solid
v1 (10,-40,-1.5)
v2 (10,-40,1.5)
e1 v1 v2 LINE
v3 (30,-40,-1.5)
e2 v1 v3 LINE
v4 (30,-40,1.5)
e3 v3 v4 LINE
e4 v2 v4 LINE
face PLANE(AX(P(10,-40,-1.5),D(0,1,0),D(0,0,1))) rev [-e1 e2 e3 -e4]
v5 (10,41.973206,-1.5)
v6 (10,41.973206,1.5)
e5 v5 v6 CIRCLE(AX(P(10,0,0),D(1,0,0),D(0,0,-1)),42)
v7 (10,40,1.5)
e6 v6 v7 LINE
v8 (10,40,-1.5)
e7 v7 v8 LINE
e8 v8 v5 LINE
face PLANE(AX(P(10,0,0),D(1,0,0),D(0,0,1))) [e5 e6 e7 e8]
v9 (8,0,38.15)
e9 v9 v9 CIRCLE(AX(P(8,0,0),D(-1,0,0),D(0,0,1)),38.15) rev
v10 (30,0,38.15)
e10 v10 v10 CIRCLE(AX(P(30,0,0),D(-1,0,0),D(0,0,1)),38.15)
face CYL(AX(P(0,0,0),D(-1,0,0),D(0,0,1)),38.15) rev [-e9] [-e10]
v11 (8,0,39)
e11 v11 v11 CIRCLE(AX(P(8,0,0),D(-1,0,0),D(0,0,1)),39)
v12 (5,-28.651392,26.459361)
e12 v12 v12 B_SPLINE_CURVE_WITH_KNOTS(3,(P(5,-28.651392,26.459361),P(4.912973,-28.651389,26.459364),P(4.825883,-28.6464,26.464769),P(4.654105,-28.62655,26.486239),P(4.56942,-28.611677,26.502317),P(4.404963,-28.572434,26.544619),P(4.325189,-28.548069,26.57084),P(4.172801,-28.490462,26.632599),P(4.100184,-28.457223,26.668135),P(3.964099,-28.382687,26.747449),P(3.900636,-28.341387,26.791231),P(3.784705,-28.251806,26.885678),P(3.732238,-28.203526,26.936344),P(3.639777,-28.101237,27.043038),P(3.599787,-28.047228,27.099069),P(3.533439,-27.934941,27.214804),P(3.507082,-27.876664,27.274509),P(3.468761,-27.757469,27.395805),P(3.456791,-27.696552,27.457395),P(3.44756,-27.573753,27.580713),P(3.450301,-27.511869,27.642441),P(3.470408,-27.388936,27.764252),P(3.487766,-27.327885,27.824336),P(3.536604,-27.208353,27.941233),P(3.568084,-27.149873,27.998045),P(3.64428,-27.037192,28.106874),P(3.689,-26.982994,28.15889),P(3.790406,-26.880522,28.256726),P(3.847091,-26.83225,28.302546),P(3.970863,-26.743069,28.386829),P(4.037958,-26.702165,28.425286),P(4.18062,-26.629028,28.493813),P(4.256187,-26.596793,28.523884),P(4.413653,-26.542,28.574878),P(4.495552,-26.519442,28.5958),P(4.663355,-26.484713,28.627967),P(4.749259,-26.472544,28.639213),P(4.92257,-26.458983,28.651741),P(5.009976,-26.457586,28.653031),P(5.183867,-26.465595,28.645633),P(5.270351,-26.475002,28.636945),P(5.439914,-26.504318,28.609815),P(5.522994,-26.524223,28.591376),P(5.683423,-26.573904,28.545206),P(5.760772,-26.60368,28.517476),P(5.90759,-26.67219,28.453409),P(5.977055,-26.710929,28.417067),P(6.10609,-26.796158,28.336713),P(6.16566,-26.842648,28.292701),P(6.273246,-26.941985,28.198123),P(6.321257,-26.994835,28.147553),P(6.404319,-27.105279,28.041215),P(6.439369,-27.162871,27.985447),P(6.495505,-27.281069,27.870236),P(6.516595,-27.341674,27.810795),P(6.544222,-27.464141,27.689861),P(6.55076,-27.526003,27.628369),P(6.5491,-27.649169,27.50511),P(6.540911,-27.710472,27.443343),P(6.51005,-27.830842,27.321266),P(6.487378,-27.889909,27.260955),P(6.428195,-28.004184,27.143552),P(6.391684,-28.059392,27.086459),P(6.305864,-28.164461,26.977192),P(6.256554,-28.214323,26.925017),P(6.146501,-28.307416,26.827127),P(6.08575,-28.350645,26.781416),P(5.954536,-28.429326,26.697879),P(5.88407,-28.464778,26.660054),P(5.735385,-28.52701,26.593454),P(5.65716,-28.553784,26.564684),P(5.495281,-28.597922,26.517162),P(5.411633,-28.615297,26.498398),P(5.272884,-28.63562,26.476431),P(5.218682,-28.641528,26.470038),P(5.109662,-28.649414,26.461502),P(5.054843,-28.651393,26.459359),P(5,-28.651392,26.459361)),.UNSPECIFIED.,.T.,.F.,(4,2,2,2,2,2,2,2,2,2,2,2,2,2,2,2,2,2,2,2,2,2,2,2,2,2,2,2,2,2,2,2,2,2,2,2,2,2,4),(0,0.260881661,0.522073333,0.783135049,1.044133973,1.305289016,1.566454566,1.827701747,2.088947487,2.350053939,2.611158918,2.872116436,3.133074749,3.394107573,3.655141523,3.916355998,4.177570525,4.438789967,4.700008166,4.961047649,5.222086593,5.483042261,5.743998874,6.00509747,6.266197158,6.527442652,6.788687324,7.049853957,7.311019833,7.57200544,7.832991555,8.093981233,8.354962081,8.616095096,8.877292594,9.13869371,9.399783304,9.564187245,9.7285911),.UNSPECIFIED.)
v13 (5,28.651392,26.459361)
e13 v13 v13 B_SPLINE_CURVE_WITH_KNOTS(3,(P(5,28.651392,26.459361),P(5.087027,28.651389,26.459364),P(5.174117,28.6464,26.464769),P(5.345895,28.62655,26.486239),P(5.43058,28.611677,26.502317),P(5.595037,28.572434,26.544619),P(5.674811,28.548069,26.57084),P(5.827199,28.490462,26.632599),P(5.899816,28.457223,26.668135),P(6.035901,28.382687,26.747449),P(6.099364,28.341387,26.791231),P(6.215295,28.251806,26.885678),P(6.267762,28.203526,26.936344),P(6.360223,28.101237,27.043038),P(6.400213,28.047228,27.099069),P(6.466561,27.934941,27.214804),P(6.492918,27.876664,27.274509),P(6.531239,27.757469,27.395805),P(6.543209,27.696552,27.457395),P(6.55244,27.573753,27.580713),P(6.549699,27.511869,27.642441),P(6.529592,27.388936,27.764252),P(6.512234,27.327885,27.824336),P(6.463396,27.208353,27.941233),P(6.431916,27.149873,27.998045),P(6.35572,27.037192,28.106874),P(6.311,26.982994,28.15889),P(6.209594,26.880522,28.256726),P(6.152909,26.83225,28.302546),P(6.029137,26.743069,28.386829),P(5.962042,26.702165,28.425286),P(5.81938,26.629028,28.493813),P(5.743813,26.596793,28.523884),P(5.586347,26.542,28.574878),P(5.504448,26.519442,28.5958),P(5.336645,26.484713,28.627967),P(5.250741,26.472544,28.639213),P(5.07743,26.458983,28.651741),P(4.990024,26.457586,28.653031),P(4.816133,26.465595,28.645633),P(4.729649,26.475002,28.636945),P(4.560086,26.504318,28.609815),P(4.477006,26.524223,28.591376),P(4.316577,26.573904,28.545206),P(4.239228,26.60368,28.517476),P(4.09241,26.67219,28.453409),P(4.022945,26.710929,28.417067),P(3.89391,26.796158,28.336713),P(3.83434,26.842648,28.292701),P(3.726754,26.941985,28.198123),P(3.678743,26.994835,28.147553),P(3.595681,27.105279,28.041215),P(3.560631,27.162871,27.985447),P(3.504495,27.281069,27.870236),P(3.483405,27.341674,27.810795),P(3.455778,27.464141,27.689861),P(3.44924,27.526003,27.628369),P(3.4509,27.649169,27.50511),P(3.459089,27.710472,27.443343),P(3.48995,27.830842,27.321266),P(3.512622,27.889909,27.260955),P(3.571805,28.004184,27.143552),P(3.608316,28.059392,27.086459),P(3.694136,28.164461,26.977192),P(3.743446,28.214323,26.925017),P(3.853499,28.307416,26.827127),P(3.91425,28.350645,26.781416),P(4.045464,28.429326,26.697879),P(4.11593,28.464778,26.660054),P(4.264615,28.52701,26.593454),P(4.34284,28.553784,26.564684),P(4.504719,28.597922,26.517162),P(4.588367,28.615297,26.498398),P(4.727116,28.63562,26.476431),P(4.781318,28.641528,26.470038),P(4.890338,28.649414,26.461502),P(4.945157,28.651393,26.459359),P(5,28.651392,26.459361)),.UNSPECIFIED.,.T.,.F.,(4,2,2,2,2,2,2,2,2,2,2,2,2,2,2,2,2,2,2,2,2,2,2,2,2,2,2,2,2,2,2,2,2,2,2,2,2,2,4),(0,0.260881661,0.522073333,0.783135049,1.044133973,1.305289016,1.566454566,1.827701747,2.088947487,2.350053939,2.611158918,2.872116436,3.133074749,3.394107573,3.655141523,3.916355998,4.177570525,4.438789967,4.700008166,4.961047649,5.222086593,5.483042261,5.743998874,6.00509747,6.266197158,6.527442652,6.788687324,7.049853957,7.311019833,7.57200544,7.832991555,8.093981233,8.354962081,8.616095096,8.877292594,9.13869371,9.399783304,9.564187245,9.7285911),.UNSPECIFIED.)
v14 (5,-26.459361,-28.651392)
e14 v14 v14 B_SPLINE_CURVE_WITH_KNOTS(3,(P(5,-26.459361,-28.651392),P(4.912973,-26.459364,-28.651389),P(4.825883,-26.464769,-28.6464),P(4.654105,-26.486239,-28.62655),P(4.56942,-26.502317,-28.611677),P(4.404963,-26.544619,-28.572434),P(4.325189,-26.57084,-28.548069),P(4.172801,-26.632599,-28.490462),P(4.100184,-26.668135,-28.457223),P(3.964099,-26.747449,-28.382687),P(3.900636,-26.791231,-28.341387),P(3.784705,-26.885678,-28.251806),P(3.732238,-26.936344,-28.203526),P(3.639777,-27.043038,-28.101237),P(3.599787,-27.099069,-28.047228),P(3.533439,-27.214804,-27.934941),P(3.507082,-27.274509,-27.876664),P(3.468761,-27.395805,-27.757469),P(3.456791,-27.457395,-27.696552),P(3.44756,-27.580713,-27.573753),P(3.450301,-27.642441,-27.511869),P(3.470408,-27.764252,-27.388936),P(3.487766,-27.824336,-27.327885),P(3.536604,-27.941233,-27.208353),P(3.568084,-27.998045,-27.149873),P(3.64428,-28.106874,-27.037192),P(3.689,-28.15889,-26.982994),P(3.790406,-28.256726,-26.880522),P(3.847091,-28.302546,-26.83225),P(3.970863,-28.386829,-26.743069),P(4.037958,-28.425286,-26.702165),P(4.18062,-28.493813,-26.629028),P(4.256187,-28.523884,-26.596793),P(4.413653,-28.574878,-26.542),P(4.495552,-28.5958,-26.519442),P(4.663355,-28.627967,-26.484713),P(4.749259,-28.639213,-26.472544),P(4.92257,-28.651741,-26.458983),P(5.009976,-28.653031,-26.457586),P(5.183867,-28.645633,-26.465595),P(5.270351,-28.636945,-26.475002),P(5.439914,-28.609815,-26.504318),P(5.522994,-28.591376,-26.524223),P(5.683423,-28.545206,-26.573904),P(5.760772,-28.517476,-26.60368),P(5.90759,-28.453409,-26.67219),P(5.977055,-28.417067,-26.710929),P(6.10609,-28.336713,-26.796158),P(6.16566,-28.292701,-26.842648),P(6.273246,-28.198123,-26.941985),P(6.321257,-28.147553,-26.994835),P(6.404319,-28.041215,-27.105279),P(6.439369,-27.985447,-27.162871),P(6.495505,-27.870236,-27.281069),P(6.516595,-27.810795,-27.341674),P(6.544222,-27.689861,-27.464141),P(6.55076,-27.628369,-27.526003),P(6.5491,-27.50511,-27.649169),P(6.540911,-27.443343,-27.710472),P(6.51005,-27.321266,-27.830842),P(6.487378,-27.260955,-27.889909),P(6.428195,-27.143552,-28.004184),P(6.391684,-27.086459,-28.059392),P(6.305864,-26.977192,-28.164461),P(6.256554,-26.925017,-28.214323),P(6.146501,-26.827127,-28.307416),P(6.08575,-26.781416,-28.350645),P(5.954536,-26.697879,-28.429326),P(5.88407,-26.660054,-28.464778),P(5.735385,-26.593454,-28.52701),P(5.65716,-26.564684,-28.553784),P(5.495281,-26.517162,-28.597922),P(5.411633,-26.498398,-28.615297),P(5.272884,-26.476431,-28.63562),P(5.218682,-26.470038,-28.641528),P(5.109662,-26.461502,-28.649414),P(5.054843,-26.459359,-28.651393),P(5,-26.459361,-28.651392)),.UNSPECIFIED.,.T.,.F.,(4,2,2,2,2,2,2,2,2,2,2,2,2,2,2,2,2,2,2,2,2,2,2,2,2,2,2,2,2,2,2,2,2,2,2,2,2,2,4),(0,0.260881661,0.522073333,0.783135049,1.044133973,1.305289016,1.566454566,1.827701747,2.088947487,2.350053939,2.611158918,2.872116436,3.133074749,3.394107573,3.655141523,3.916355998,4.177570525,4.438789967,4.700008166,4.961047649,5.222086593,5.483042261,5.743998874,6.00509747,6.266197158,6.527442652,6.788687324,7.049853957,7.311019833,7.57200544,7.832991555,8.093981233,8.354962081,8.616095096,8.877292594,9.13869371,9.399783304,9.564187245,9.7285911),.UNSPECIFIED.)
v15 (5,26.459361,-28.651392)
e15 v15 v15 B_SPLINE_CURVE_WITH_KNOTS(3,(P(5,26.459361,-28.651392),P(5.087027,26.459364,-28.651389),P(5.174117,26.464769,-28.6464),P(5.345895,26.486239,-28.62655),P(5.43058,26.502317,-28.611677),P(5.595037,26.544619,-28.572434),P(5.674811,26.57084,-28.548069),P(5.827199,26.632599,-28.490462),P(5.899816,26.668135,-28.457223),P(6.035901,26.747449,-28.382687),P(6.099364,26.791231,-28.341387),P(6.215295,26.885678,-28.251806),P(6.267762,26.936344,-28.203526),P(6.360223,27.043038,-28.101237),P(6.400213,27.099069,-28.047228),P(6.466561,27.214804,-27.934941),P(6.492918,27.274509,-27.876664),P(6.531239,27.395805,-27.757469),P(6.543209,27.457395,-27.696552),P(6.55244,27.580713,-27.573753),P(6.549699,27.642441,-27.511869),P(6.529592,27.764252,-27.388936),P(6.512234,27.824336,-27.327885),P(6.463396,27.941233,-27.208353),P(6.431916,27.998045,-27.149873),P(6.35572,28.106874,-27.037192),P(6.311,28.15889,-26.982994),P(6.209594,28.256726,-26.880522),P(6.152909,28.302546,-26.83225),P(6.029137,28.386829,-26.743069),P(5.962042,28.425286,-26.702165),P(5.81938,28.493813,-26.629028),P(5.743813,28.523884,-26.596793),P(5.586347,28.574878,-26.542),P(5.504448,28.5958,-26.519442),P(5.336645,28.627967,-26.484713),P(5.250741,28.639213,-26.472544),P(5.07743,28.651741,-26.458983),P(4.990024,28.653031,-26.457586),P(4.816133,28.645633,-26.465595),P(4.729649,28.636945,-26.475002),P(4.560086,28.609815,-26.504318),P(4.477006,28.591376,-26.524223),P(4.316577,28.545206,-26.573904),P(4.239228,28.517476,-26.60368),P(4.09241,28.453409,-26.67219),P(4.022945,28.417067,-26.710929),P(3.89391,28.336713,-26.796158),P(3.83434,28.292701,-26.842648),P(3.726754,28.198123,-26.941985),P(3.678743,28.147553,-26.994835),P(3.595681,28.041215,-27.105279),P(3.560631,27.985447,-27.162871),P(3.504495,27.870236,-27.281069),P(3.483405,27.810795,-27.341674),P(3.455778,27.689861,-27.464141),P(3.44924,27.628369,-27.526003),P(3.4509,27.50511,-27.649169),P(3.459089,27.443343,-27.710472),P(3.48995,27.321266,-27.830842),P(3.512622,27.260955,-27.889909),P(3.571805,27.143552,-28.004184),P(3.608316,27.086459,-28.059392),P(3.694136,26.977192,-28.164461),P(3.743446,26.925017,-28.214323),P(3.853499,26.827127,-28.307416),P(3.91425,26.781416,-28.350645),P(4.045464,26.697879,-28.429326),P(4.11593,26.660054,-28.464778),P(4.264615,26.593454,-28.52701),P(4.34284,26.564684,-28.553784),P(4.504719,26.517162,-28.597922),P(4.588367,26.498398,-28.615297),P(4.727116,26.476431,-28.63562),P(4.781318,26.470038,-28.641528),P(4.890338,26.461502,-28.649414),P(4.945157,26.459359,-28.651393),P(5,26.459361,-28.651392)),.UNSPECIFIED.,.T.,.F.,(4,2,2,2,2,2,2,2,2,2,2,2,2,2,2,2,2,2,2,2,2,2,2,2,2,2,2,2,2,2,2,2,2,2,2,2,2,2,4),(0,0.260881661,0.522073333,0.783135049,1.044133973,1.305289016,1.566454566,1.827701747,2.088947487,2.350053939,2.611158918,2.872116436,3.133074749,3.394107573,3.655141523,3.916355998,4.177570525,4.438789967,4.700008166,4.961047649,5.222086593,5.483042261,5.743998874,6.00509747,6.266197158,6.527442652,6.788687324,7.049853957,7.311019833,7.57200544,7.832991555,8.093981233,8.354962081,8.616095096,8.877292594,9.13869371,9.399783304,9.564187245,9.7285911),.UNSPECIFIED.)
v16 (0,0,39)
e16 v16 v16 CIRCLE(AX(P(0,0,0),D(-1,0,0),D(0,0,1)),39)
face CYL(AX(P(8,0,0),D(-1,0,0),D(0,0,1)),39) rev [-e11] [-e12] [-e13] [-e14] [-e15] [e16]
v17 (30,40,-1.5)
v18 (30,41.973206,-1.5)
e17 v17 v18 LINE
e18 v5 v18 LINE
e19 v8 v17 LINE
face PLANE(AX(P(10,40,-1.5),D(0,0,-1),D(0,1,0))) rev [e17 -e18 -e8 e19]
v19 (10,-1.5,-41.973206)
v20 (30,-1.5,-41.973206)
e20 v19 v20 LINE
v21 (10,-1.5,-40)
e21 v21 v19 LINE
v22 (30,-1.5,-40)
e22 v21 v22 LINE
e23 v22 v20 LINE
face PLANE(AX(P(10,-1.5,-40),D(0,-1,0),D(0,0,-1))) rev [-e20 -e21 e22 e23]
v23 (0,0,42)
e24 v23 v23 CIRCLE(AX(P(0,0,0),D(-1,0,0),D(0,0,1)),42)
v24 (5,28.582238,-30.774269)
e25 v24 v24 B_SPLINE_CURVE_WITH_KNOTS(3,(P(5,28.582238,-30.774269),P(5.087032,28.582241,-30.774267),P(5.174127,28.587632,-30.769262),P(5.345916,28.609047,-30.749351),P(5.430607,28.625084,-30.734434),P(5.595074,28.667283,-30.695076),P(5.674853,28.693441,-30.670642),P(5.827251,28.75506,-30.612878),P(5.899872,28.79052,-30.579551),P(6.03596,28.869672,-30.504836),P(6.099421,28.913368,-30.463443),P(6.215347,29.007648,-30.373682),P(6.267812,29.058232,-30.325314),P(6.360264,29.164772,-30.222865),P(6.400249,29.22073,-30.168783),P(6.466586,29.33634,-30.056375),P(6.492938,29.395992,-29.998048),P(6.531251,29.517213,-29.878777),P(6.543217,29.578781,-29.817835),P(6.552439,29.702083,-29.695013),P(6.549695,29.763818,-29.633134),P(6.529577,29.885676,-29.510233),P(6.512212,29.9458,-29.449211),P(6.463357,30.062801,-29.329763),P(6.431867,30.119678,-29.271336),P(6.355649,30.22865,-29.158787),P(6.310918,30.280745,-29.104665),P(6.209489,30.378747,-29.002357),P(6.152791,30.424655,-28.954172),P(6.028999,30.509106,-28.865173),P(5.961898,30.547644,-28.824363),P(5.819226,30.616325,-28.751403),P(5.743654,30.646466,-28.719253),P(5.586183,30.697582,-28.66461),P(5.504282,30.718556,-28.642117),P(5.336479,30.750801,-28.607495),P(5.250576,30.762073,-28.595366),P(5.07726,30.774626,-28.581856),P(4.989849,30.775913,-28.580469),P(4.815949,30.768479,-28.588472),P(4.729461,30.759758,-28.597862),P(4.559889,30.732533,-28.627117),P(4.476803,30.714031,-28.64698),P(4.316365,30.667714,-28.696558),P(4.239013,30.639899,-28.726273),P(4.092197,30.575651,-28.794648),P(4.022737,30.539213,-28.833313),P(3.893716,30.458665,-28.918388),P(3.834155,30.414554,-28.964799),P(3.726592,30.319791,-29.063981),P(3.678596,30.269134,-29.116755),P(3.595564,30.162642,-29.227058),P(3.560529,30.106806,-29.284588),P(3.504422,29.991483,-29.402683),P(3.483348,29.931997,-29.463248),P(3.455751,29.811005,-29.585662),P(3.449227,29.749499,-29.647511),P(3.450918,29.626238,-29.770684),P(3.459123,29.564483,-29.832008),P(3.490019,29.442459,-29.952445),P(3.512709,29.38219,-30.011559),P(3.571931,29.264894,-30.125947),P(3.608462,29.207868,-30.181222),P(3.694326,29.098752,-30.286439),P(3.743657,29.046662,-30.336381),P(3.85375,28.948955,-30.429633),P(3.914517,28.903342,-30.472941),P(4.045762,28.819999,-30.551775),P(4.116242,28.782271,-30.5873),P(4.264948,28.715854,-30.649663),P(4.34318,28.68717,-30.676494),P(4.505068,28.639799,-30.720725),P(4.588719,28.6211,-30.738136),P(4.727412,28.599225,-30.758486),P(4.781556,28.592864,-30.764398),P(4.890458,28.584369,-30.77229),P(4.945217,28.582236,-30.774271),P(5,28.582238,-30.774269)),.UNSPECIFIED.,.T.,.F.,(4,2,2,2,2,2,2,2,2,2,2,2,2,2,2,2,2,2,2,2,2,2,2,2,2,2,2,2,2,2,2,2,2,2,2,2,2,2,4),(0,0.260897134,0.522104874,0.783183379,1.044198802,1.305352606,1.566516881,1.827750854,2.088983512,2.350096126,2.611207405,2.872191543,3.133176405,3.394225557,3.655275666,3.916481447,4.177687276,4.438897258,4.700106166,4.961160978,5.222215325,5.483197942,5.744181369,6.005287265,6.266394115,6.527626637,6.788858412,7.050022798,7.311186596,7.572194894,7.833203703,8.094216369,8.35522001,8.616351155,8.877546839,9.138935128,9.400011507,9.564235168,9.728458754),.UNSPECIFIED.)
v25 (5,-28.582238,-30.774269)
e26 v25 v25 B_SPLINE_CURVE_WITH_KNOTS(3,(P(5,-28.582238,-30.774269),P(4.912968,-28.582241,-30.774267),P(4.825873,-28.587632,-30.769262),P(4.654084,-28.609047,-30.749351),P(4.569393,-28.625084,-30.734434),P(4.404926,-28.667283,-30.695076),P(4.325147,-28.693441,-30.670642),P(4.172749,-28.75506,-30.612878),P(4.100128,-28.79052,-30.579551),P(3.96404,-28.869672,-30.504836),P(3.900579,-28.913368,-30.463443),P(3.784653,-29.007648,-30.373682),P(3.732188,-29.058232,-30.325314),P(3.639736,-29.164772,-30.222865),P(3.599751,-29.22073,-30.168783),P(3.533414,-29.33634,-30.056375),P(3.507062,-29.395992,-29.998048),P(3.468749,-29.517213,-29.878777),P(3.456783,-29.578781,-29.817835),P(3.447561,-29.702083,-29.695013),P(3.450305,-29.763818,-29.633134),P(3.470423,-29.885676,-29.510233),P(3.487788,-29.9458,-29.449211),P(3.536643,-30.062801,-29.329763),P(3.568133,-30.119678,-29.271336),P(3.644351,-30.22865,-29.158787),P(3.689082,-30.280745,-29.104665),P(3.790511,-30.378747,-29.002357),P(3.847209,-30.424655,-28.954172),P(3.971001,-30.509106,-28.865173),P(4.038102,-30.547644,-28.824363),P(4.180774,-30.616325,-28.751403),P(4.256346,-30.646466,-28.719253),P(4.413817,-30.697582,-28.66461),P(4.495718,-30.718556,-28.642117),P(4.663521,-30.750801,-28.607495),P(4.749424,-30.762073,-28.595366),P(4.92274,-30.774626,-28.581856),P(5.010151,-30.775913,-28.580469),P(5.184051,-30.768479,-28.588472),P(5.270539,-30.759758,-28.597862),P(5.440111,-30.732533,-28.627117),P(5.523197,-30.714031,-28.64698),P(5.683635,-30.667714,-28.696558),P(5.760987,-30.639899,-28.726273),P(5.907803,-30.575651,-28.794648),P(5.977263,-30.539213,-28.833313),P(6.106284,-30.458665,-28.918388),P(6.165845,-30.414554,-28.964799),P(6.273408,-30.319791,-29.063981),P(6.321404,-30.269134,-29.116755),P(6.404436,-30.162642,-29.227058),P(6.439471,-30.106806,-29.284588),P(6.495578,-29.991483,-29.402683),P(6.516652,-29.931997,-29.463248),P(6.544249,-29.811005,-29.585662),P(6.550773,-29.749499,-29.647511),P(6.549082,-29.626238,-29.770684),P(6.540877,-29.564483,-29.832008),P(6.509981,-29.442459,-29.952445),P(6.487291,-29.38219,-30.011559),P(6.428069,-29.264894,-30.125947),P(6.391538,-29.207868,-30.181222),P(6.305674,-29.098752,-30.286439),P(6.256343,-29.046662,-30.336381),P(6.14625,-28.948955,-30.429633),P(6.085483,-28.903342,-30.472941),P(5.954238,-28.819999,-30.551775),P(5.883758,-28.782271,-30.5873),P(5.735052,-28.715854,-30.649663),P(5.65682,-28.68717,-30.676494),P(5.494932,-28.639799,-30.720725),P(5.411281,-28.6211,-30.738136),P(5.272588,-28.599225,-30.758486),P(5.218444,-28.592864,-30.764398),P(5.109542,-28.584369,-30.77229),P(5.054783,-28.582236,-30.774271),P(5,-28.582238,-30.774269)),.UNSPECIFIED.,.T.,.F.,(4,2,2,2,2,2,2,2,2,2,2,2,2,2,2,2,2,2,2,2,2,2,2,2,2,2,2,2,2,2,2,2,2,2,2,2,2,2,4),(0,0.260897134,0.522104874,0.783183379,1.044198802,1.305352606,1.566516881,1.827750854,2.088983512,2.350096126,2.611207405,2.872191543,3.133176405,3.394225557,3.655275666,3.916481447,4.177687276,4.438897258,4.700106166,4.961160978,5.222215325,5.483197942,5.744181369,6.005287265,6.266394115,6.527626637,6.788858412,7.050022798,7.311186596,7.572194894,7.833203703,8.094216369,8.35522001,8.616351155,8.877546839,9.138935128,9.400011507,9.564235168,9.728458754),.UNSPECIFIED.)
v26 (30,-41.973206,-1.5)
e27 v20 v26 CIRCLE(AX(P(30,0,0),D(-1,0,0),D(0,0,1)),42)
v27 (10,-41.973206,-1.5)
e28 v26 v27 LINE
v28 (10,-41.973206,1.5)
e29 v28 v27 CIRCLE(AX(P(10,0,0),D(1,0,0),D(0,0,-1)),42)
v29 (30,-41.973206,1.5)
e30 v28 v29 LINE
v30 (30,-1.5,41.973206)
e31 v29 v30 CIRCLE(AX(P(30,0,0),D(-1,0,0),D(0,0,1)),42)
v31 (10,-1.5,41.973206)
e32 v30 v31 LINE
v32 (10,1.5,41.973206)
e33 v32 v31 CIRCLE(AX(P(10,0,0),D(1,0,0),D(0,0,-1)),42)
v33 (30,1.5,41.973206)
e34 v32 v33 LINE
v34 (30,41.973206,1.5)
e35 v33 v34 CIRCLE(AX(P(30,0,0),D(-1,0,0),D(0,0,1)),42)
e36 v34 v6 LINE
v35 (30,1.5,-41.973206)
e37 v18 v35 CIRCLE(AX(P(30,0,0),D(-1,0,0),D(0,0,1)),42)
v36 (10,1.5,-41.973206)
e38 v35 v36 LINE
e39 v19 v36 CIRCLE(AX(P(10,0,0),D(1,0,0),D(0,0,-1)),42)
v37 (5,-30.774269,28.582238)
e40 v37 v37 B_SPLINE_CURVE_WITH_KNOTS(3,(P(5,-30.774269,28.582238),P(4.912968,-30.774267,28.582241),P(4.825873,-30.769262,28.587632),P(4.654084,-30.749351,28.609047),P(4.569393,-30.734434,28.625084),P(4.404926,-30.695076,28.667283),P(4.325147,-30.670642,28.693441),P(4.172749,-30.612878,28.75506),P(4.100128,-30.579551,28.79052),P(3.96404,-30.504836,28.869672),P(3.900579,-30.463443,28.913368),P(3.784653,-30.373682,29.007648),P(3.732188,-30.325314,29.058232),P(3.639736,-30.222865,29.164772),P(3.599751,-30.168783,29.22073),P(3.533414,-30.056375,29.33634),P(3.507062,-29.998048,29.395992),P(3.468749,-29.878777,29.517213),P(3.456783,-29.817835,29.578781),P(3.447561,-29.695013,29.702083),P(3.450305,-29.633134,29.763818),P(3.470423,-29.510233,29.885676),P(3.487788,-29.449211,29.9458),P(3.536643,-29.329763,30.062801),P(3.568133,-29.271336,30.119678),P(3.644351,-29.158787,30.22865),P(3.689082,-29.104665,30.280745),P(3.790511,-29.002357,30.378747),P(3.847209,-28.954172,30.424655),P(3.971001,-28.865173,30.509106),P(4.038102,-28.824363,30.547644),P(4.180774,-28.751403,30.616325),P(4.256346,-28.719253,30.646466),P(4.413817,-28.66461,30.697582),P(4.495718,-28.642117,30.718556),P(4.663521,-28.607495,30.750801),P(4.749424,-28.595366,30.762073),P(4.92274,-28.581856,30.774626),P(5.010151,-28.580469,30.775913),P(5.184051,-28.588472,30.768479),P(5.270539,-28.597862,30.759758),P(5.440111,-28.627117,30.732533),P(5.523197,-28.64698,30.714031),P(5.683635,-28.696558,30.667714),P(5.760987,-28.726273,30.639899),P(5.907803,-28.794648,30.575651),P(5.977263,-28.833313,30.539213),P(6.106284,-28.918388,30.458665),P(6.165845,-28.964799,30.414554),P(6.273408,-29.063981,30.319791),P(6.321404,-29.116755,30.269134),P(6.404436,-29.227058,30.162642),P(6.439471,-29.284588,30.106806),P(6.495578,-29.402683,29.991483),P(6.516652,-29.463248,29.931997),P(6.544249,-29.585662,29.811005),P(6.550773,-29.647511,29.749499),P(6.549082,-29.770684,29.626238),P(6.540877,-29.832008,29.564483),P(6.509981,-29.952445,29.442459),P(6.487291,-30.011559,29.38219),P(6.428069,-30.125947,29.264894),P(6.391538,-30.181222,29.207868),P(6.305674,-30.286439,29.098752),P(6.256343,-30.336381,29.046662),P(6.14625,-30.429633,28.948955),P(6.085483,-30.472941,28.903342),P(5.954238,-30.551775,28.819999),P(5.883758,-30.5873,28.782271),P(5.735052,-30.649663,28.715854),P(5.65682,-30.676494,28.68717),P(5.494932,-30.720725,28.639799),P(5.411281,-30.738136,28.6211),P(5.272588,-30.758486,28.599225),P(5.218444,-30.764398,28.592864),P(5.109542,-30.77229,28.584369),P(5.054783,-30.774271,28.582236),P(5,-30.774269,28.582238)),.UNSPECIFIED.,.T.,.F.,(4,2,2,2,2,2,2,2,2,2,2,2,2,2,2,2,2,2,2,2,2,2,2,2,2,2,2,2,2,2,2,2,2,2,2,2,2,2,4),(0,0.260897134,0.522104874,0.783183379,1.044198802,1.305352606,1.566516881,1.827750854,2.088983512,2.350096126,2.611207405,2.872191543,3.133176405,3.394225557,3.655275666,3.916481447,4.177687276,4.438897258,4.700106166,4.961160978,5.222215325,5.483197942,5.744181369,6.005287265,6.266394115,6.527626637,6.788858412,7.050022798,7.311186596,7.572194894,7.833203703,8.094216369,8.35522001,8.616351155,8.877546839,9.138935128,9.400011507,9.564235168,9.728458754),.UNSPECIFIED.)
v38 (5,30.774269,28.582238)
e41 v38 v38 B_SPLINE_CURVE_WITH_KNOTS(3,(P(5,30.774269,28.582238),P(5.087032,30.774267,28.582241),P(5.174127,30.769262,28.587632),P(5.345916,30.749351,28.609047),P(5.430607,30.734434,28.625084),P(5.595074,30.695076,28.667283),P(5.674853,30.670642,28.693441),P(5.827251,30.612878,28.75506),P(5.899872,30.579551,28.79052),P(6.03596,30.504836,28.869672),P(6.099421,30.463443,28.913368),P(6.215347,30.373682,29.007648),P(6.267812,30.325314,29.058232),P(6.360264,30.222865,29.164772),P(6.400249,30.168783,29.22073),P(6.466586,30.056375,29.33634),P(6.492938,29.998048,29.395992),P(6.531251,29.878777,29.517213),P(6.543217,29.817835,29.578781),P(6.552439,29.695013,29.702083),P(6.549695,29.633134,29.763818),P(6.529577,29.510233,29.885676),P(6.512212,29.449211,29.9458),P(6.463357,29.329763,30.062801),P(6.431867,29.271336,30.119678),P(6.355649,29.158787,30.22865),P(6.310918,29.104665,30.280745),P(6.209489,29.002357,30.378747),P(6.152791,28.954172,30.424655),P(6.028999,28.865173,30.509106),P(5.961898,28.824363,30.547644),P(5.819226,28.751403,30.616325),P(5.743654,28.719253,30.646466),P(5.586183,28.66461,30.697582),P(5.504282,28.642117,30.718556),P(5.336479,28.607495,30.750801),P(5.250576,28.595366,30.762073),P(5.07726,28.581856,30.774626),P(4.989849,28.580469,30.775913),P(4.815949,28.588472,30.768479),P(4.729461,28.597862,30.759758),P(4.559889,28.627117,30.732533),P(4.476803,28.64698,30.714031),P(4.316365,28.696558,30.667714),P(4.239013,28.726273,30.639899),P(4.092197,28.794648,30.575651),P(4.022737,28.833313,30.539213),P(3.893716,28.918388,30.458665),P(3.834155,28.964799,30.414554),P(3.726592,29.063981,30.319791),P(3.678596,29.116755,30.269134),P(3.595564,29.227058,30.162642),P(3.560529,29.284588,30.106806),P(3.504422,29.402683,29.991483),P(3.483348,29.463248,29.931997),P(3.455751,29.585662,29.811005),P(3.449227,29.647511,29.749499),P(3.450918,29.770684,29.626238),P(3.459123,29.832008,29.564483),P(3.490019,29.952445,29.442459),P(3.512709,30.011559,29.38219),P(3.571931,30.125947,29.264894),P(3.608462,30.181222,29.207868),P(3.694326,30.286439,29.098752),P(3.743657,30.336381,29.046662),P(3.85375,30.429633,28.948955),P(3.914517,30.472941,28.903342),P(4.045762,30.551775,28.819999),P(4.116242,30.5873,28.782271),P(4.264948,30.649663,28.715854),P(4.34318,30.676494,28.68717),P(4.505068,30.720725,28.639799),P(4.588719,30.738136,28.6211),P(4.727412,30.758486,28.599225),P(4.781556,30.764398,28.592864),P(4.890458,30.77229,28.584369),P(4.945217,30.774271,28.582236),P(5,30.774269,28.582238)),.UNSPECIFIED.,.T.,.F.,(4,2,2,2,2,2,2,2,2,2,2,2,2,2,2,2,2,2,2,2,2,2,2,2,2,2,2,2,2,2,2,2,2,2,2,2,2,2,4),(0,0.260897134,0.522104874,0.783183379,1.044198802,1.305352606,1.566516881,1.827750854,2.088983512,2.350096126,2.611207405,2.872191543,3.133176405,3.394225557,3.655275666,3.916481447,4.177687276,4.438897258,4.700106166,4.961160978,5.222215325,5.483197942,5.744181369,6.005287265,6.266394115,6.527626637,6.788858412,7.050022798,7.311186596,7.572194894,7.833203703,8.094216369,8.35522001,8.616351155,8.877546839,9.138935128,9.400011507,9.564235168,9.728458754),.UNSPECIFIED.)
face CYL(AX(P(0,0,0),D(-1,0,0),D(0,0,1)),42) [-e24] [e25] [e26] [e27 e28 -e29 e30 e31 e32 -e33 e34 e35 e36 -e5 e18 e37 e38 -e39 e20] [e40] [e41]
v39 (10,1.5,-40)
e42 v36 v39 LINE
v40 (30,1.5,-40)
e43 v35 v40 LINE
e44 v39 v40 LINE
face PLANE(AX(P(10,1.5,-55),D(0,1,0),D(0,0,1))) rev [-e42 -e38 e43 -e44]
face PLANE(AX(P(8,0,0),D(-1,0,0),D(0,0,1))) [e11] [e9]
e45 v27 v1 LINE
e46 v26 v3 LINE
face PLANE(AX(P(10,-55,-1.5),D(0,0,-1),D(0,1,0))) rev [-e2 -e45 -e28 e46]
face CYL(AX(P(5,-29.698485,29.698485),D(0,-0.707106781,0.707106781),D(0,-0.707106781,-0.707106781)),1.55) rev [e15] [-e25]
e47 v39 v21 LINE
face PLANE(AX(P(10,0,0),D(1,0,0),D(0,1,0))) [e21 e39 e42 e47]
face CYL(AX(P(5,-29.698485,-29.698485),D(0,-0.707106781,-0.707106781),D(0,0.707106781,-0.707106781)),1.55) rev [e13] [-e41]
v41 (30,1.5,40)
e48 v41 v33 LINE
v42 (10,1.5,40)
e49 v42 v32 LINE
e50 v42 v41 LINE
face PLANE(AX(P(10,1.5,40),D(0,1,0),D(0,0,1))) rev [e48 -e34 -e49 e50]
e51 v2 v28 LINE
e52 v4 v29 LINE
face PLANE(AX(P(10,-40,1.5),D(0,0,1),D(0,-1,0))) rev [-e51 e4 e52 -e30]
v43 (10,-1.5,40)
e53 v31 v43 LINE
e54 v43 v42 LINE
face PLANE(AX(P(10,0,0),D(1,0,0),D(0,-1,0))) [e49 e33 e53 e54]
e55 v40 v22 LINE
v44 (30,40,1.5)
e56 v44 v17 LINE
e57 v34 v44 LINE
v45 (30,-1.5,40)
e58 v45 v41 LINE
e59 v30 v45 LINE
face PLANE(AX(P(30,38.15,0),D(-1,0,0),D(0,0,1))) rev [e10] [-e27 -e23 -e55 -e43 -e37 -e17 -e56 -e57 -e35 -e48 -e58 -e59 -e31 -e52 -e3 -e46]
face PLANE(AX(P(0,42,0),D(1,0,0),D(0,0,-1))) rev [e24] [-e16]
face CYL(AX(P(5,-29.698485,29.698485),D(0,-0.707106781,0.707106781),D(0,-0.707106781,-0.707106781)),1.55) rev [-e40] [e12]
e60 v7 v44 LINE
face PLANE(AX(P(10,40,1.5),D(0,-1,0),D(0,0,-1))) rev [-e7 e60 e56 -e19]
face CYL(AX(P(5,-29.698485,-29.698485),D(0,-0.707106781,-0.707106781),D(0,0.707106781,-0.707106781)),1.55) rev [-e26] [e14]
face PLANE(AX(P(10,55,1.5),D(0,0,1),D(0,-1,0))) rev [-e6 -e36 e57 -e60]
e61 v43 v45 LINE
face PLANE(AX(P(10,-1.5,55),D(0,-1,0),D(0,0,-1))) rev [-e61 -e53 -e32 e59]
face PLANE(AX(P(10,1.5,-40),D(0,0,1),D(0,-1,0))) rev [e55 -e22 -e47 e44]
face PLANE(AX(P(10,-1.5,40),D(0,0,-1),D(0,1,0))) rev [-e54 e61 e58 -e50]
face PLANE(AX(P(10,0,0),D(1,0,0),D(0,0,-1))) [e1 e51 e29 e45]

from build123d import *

# Parameters (mm, degrees)
ESQUISSE1_W                  = 30
ESQUISSE1_H                  = 3.85
D_GAGEMENT_M2_51_D           = 3.1
R_P_TITION_CIRCULAIRE1_COUNT = 2
R_P_TITION_CIRCULAIRE1_ANGLE = 90
ESQUISSE4_W                  = 3
ESQUISSE4_H                  = 15
ENL_V_MAT_EXTRU_1_DEPTH      = 20
R_P_TITION_START             = 10
R_P_TITION_CIRCULAIRE2_DEPTH = 20
ESQUISSE5_R                  = 39
ENL_V_MAT_EXTRU_2_DEPTH      = 8


# Read off the part's stored shape, not the designer's step: Répétition circulaire2
with BuildPart() as part:
    # Esquisse1 → Révolution1 (revolve)
    with BuildSketch(Plane.XY, mode=Mode.PRIVATE) as r_volution1_sk:
        with Locations((15, 40.075)):
            Rectangle(ESQUISSE1_W, ESQUISSE1_H)
    revolve(r_volution1_sk.sketch.rotate(Axis((0, 0, 0), (1, 0, 0)), 90), axis=Axis((0, 0, 0), (1, 0, 0)))

    # Dégagement M2.51 (through all)
    with Locations(Plane(origin=(5, -29.69848481, -29.69848481), x_dir=(0, -0.707106781187, 0.707106781187), z_dir=(0, -0.707106781187, -0.707106781187))):
        with Locations((0, 0)):
            d_gagement_m2_51 = Hole(D_GAGEMENT_M2_51_D / 2)

    # Répétition circulaire1: Dégagement M2.51 ×2 about axis
    r_p_tition_circulaire1_axis = Axis((0, 0, 0), (-1, 0, 0))
    for i in range(1, R_P_TITION_CIRCULAIRE1_COUNT):
        add(d_gagement_m2_51.rotate(r_p_tition_circulaire1_axis, i * R_P_TITION_CIRCULAIRE1_ANGLE / (R_P_TITION_CIRCULAIRE1_COUNT - 1)), mode=Mode.SUBTRACT)

    # Esquisse4 → Enlèv. mat.-Extru.1 (cut)
    with BuildSketch(Plane(origin=(30, 0, 0), x_dir=(0, 0, -1), z_dir=(1, 0, 0))):
        with Locations((0, -47.5)):
            Rectangle(ESQUISSE4_W, ESQUISSE4_H)
    extrude(amount=-ENL_V_MAT_EXTRU_1_DEPTH, mode=Mode.SUBTRACT)

    # Répétition circulaire2 outline → Répétition circulaire2 (cut)
    with BuildSketch(Plane.YZ.offset(R_P_TITION_START)):
        with BuildLine():
            ThreePointArc((41.973205739, -1.5), (42, 0), (41.973205739, 1.5))
            Line((41.973205739, 1.5), (40, 1.5))
            Line((40, 1.5), (40, -1.5))
            Line((40, -1.5), (41.973205739, -1.5))
        make_face()
        with BuildLine():
            Line((1.5, 40), (1.5, 41.973205739))
            ThreePointArc((1.5, 41.973205739), (0, 42), (-1.5, 41.973205739))
            Line((-1.5, 41.973205739), (-1.5, 40))
            Line((-1.5, 40), (1.5, 40))
        make_face()
        with BuildLine():
            ThreePointArc((-1.5, -41.973205739), (0, -42), (1.5, -41.973205739))
            Line((1.5, -41.973205739), (1.5, -40))
            Line((1.5, -40), (-1.5, -40))
            Line((-1.5, -40), (-1.5, -41.973205739))
        make_face()
    extrude(amount=R_P_TITION_CIRCULAIRE2_DEPTH, mode=Mode.SUBTRACT)

    # Esquisse5 → Enlèv. mat.-Extru.2 (cut)
    with BuildSketch(Plane.ZY):
        Circle(ESQUISSE5_R)
    extrude(amount=-ENL_V_MAT_EXTRU_2_DEPTH, mode=Mode.SUBTRACT)


solid = part.part
